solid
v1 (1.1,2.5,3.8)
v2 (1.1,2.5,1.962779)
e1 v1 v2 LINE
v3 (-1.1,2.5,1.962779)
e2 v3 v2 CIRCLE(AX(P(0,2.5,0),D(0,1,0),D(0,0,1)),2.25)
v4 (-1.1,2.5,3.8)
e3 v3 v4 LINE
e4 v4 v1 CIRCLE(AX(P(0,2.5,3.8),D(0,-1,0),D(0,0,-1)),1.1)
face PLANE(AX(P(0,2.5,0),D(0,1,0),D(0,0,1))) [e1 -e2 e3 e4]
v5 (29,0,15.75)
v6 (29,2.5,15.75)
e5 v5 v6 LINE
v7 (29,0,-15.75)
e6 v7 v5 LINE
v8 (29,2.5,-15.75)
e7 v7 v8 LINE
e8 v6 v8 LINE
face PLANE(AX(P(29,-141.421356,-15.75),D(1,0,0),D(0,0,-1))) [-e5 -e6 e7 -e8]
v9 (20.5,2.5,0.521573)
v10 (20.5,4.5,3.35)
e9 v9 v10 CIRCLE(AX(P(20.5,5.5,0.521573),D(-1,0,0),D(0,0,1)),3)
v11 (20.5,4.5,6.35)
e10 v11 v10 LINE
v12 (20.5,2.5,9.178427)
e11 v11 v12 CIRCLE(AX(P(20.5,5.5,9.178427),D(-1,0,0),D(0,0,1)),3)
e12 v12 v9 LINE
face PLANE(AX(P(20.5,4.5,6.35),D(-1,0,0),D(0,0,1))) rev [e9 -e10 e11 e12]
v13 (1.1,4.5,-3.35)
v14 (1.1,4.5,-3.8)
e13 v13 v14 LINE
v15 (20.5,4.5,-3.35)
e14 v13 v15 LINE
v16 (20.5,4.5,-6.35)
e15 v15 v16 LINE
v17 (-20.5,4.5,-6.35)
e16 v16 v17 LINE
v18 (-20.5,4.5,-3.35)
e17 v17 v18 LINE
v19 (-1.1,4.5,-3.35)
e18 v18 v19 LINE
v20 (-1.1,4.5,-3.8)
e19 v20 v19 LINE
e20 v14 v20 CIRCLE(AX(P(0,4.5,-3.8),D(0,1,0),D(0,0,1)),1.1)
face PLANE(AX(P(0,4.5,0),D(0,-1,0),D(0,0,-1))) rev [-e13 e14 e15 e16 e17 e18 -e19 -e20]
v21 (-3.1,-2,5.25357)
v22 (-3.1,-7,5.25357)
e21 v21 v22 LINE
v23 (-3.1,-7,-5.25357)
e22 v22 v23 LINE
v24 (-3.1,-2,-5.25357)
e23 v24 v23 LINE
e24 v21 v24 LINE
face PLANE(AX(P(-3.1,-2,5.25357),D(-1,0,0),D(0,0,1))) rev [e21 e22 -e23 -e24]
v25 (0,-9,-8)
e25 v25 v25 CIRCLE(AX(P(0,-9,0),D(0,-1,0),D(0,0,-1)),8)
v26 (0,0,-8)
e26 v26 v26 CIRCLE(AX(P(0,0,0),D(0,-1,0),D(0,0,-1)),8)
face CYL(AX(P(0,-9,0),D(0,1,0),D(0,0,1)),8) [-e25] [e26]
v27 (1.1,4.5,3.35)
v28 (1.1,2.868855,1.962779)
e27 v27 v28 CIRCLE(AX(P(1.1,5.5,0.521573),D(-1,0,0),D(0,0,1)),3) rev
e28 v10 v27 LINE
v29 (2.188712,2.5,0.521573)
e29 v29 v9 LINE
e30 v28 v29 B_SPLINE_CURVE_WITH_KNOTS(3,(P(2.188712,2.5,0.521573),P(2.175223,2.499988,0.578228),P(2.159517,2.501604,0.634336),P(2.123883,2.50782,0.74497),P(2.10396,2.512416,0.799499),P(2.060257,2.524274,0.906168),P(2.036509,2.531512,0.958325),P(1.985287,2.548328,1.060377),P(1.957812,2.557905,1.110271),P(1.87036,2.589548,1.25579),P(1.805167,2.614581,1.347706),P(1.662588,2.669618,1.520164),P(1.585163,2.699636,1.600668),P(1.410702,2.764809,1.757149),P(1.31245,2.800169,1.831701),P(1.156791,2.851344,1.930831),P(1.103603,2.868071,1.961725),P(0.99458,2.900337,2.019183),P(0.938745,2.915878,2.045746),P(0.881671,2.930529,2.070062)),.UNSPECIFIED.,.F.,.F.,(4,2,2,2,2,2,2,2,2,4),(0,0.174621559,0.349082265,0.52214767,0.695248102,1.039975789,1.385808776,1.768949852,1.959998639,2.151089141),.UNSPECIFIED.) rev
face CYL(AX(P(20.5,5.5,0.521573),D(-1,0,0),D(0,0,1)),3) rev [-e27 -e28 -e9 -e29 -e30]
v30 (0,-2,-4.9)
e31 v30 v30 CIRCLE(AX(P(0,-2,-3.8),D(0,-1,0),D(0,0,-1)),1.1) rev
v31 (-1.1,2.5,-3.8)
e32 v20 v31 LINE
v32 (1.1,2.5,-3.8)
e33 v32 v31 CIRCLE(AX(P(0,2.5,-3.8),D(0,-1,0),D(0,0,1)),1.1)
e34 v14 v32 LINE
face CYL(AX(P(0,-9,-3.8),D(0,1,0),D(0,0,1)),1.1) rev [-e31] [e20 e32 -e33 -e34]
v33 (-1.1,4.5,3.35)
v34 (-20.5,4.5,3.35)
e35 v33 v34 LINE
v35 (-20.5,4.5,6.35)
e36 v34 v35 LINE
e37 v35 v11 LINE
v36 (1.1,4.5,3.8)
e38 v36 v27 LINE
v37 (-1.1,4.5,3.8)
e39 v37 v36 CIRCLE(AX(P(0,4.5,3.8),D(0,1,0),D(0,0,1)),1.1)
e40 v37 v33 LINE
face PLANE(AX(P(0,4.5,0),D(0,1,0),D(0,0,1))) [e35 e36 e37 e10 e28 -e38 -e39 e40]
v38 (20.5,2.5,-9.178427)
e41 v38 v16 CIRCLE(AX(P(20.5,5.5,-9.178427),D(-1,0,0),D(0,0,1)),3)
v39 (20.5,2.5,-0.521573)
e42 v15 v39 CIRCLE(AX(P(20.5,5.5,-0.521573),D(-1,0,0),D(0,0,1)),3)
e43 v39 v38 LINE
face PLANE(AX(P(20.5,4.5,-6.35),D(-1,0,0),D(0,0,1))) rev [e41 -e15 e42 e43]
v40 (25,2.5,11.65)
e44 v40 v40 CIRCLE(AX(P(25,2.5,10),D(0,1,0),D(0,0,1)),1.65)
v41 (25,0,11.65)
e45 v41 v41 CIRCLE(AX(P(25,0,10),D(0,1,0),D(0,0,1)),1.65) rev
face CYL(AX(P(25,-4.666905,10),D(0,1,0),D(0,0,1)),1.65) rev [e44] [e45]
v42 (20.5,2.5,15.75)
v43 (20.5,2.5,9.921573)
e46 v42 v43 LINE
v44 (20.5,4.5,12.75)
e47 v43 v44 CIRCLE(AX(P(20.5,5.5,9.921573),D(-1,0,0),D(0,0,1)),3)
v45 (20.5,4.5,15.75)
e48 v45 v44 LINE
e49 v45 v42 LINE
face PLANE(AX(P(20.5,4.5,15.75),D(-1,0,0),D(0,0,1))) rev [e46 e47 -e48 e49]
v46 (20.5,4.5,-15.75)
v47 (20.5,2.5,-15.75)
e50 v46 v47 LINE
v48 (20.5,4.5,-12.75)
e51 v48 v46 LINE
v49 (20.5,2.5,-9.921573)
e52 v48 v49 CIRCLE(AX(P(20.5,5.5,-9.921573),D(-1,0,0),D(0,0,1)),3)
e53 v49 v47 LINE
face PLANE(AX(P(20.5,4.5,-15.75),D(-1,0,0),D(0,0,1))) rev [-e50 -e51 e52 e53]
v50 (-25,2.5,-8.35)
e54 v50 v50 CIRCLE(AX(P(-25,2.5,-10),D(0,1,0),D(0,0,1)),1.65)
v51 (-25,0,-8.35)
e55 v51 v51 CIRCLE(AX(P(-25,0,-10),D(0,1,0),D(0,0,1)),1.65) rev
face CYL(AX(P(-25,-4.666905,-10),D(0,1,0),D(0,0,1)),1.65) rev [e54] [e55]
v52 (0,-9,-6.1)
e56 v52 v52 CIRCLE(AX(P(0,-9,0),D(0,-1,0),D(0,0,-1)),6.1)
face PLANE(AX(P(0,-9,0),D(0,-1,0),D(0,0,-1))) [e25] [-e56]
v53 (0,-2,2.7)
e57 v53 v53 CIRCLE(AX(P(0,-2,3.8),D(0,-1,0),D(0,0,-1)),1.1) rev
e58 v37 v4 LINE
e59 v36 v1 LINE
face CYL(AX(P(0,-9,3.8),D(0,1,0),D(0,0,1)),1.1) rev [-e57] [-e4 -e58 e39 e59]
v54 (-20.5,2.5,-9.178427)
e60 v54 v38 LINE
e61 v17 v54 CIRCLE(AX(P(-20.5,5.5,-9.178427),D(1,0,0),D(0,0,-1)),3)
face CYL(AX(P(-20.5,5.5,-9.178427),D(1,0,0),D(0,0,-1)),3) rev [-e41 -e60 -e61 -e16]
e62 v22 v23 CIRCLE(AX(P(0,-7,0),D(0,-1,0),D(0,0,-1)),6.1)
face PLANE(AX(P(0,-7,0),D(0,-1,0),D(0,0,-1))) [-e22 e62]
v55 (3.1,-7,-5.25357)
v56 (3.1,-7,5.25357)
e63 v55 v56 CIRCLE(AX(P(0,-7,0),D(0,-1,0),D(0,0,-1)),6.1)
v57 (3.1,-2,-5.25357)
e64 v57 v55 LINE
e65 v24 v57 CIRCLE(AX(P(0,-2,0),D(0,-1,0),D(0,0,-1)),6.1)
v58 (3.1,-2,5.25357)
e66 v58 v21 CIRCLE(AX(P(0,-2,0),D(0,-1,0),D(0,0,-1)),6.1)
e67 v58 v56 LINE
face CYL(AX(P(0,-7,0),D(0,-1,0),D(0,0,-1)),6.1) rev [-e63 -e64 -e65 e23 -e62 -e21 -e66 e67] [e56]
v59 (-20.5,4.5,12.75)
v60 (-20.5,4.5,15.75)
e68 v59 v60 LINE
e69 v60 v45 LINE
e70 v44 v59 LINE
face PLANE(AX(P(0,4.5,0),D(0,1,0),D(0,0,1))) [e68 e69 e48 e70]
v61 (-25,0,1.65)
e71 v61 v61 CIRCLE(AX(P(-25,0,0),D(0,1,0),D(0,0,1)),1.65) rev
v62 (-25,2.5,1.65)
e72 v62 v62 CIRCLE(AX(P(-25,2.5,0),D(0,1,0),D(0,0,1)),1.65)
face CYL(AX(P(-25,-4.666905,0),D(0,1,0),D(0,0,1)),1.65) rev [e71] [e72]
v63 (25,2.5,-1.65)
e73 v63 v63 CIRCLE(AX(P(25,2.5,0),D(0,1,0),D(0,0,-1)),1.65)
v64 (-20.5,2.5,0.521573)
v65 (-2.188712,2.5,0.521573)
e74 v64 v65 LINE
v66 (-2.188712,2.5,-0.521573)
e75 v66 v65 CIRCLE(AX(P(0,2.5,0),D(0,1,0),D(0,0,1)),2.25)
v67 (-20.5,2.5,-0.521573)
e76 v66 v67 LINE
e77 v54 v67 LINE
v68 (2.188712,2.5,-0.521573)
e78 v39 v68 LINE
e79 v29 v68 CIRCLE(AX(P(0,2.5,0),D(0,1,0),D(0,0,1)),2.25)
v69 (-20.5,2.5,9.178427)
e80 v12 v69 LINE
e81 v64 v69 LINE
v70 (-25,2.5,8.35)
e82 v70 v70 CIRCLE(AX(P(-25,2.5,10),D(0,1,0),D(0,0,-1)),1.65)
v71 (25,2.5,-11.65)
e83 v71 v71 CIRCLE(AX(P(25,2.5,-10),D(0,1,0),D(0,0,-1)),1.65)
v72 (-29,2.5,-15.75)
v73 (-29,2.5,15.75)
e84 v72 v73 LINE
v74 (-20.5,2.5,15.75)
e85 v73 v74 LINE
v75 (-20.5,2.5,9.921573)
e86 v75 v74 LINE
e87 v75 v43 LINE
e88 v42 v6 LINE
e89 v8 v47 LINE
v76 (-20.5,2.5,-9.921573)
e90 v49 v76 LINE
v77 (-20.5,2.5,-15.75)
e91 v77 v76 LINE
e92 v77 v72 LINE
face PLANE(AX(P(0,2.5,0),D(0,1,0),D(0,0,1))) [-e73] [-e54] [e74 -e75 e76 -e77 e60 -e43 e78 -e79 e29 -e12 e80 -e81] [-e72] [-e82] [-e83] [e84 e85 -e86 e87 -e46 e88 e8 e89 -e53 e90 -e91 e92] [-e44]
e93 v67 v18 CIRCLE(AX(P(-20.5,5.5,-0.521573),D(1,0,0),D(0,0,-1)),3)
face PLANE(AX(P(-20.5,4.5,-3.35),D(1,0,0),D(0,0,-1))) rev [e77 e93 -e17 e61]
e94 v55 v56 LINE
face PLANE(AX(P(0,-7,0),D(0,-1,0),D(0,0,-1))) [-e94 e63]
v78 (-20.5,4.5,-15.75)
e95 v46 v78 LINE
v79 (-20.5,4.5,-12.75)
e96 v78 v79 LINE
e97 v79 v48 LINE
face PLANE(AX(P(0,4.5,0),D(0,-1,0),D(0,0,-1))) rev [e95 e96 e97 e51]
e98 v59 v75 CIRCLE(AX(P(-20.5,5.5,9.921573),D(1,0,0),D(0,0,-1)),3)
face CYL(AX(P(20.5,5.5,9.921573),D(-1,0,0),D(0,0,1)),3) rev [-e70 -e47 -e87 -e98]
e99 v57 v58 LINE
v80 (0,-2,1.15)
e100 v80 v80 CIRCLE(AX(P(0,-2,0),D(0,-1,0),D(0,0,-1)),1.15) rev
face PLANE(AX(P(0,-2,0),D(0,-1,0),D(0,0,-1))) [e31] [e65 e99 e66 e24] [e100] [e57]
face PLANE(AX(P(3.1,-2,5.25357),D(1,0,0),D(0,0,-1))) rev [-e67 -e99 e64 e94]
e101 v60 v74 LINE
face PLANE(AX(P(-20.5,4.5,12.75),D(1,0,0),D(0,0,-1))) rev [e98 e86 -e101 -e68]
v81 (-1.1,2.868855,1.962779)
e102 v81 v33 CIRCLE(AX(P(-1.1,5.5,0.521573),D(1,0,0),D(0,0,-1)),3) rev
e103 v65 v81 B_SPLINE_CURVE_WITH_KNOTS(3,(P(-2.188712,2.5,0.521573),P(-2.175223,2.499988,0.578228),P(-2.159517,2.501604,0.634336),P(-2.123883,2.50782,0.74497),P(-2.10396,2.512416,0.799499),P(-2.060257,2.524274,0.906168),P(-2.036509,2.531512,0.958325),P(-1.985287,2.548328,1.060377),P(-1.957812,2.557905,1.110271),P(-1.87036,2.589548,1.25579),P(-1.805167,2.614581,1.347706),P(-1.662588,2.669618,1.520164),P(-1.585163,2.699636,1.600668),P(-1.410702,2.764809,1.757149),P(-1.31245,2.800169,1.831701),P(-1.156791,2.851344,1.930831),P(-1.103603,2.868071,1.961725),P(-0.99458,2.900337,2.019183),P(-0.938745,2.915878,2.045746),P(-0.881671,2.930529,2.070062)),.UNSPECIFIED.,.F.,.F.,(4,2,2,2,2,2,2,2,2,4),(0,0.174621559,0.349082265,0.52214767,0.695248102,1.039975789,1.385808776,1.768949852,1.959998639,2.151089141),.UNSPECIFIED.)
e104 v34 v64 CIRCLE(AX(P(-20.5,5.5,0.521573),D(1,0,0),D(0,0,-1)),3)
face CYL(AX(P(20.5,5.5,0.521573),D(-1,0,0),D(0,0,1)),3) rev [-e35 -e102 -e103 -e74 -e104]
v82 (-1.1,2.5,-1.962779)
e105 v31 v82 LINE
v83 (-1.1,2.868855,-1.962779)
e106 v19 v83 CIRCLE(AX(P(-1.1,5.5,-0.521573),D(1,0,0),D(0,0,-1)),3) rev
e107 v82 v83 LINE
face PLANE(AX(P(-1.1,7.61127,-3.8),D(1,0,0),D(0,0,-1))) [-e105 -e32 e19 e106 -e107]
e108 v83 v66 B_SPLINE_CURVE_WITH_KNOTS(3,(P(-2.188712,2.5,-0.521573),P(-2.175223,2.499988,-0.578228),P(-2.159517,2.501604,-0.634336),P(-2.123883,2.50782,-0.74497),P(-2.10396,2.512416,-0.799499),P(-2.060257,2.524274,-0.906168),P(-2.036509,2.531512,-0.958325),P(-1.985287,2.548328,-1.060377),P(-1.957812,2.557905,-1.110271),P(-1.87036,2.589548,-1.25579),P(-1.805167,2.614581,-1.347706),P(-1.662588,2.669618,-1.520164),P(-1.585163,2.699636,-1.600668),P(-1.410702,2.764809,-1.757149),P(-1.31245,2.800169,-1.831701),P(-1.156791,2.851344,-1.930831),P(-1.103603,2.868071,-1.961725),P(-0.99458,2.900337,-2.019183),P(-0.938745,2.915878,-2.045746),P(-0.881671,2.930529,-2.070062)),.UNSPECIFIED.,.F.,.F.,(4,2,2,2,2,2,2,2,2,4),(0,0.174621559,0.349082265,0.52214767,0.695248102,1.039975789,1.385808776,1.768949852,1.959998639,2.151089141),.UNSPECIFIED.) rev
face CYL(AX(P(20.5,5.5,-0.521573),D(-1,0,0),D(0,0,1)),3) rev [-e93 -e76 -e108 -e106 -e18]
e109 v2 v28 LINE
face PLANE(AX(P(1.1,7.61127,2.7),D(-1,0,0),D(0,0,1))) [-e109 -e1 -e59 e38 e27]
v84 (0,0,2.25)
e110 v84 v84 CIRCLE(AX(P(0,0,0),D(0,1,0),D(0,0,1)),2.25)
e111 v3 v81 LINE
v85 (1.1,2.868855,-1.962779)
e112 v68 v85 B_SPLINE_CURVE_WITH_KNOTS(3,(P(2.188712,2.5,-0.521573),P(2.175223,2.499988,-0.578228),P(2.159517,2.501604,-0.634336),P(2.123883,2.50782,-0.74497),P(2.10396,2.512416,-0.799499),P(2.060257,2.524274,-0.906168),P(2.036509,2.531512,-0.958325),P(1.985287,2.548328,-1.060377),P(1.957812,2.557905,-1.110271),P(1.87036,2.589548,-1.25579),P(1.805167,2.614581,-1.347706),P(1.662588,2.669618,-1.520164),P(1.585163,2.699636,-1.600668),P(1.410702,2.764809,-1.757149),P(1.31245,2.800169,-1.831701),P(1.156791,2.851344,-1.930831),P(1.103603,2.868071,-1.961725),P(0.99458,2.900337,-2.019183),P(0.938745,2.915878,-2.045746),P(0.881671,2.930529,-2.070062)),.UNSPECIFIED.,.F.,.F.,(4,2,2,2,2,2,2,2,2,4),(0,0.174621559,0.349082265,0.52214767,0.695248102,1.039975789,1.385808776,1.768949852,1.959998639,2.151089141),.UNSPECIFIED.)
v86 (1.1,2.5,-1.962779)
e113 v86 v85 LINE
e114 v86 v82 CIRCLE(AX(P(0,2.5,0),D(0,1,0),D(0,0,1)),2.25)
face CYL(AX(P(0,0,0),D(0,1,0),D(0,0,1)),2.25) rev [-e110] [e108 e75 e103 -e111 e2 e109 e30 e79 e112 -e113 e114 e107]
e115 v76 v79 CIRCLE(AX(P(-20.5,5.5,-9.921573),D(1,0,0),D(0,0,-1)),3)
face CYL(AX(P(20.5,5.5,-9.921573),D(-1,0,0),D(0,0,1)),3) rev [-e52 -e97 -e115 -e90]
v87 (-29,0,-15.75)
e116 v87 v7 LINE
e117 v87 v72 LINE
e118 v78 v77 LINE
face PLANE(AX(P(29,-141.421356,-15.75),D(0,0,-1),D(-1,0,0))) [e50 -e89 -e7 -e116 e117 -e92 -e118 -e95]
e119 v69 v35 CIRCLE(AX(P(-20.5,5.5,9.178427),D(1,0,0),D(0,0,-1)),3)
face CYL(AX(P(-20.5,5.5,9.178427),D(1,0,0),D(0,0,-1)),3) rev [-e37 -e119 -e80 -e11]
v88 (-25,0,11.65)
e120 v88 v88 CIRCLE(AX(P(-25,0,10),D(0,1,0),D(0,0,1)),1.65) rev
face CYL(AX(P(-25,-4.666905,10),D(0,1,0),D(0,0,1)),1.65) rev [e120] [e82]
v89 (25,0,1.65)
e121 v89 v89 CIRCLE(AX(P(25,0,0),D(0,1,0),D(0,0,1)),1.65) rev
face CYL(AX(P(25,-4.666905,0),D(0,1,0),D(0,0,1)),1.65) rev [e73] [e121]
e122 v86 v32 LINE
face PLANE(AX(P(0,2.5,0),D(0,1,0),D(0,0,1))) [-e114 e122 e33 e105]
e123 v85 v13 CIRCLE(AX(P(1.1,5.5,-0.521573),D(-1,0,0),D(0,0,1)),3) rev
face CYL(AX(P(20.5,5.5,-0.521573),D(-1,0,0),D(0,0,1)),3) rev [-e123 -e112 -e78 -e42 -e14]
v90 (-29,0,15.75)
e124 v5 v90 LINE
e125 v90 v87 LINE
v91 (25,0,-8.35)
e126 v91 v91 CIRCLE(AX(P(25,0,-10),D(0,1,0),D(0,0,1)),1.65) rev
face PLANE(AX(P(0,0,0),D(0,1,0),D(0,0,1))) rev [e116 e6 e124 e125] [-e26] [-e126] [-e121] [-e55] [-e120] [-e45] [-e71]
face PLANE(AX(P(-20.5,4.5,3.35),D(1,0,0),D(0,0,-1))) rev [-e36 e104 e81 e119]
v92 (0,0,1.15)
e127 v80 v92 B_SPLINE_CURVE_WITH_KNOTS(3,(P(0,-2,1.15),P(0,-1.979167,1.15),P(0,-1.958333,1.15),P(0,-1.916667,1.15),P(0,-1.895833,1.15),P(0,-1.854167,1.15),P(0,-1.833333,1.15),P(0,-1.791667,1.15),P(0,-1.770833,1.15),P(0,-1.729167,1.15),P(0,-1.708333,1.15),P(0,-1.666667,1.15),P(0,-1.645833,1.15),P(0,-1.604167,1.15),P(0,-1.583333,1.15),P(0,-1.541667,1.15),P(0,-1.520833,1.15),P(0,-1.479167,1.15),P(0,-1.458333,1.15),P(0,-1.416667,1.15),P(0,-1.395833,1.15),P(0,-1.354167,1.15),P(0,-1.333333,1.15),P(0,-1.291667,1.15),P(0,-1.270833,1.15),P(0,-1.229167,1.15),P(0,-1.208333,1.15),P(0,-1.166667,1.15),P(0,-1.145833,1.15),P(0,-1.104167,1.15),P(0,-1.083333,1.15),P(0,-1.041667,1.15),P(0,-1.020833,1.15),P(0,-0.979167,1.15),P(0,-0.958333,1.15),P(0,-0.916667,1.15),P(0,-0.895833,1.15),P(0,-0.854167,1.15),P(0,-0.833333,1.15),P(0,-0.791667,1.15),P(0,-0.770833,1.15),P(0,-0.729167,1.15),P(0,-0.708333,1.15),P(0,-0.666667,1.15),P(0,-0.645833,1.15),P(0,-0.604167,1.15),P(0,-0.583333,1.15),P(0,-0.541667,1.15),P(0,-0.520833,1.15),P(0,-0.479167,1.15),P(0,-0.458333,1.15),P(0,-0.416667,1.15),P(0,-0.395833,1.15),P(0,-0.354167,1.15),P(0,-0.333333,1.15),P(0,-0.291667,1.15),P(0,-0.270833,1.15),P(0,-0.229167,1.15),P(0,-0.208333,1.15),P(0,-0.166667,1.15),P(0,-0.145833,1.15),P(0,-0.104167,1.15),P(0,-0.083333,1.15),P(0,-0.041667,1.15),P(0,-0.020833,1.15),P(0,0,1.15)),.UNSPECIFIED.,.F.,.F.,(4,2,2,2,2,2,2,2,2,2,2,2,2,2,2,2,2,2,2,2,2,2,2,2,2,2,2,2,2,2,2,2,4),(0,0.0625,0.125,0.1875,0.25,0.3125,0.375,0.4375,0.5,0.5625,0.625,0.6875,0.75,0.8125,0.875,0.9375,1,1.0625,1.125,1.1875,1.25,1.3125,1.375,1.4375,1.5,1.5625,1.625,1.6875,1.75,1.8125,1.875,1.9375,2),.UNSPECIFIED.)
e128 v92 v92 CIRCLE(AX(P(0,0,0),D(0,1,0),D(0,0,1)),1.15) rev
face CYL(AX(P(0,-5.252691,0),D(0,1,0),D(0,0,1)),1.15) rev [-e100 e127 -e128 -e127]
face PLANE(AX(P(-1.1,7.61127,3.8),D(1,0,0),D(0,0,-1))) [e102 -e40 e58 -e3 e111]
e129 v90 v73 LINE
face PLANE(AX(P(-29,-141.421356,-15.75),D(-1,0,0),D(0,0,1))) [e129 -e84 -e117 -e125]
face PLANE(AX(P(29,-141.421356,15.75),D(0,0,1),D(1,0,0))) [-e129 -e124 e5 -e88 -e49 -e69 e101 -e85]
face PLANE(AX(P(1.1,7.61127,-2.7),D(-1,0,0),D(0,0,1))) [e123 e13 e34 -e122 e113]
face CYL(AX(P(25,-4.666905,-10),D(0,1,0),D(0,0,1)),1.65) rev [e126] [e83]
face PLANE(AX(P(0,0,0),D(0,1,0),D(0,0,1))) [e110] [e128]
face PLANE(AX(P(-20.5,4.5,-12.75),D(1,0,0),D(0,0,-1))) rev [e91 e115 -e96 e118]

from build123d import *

# Parameters (mm, degrees)
SKETCH_1_R               = 50
EXTRUDE_1_DEPTH          = 2.5
SKETCH_2_R               = 8
EXTRUDE_2_DEPTH          = 9
SKETCH_3_R               = 6.1
CUT_EXTRUDE_1_DEPTH      = 2
CUT_EXTRUDE_2_DEPTH      = 5
SKETCH_7_R               = 1.15
CUT_EXTRUDE_4_DEPTH      = 4.5
SKETCH_8_R               = 2.25
CUT_EXTRUDE_5_DEPTH      = 2.5
CUT_EXTRUDE_6_DEPTH      = 72.281133549
CUT_EXTRUDE_6_DEPTH_BACK = 72.281133549
SKETCH_11_R              = 1.1
SKETCH_14_R              = 1.65
CUT_EXTRUDE_7_DEPTH      = 2.5
CUT_EXTRUDE_START        = -2.5
SKETCH_15_R              = 50
SKETCH_15_W              = 58
SKETCH_15_H              = 31.5
CUT_EXTRUDE_8_DEPTH      = 2.5
SKETCH_16_W              = 41
SKETCH_16_H              = 3
EXTRUDE_4_DEPTH          = 2
CUT_EXTRUDE_9_DEPTH      = 2
FILLET_3_R               = 3


with BuildPart() as part:
    # Эскиз1 → Бобышка-Вытянуть1 (new body)
    with BuildSketch(Plane(origin=(0, 0, 0), x_dir=(1, 0, 0), z_dir=(0, 1, 0))):
        with Locations(Location((0, 0, 0), (0, 0, 270))):
            Circle(SKETCH_1_R)
    extrude(amount=EXTRUDE_1_DEPTH)

    # Эскиз2 → Бобышка-Вытянуть2 (add)
    with BuildSketch(Plane.XZ):
        with Locations(Location((0, 0, 0), (0, 0, 270))):
            Circle(SKETCH_2_R)
    extrude(amount=EXTRUDE_2_DEPTH)

    # Эскиз3 → Вырез-Вытянуть1 (cut)
    with BuildSketch(Plane.XZ.offset(9)):
        with Locations(Location((0, 0, 0), (0, 0, 270))):
            Circle(SKETCH_3_R)
    extrude(amount=-CUT_EXTRUDE_1_DEPTH, mode=Mode.SUBTRACT)

    # Эскиз4 → Вырез-Вытянуть2 (cut)
    with BuildSketch(Plane.XZ.offset(7)):
        with BuildLine():
            Line((-3.1, 5.253570215), (-3.1, -5.253570215))
            ThreePointArc((-3.1, -5.253570215), (0, -6.1), (3.1, -5.253570215))
            Line((3.1, -5.253570215), (3.1, 5.253570215))
            ThreePointArc((3.1, 5.253570215), (0, 6.1), (-3.1, 5.253570215))
        make_face()
    extrude(amount=-CUT_EXTRUDE_2_DEPTH, mode=Mode.SUBTRACT)

    # Эскиз7 → Вырез-Вытянуть4 (cut)
    with BuildSketch(Plane(origin=(0, 2.5, 0), x_dir=(1, 0, 0), z_dir=(0, 1, 0))):
        with Locations(Location((0, 0, 0), (0, 0, 270))):
            Circle(SKETCH_7_R)
    extrude(amount=-CUT_EXTRUDE_4_DEPTH, mode=Mode.SUBTRACT)

    # Эскиз8 → Вырез-Вытянуть5 (cut)
    with BuildSketch(Plane(origin=(0, 2.5, 0), x_dir=(1, 0, 0), z_dir=(0, 1, 0))):
        with Locations(Location((0, 0, 0), (0, 0, 270))):
            Circle(SKETCH_8_R)
    extrude(amount=-CUT_EXTRUDE_5_DEPTH, mode=Mode.SUBTRACT)

    # Эскиз11 → Вырез-Вытянуть6 (cut, two sides: drawn at the far end of the back side and taken through both)
    with BuildSketch(Plane.XZ.offset(-CUT_EXTRUDE_6_DEPTH_BACK)):
        with Locations(Location((0, 3.8, 0), (0, 0, 270))):
            Circle(SKETCH_11_R)
        with Locations(Location((0, -3.8, 0), (0, 0, 90))):
            Circle(SKETCH_11_R)
    extrude(amount=CUT_EXTRUDE_6_DEPTH + CUT_EXTRUDE_6_DEPTH_BACK, mode=Mode.SUBTRACT)

    # Эскиз14 → Вырез-Вытянуть7 (cut)
    with BuildSketch(Plane(origin=(0, 2.5, 0), x_dir=(1, 0, 0), z_dir=(0, 1, 0))):
        with Locations(Location((-25, 0, 0), (0, 0, 270))):
            Circle(SKETCH_14_R)
        with Locations(Location((-25, 10, 0), (0, 0, 270))):
            Circle(SKETCH_14_R)
        with Locations(Location((-25, -10, 0), (0, 0, 270))):
            Circle(SKETCH_14_R)
        with Locations(Location((25, -10, 0), (0, 0, 270))):
            Circle(SKETCH_14_R)
        with Locations(Location((25, 0, 0), (0, 0, 270))):
            Circle(SKETCH_14_R)
        with Locations(Location((25, 10, 0), (0, 0, 270))):
            Circle(SKETCH_14_R)
    extrude(amount=-CUT_EXTRUDE_7_DEPTH, mode=Mode.SUBTRACT)

    # Эскиз15 → Вырез-Вытянуть8 (cut)
    with BuildSketch(Plane(origin=(0, 2.5, 0), x_dir=(1, 0, 0), z_dir=(0, 1, 0)).offset(CUT_EXTRUDE_START)):
        Circle(SKETCH_15_R)
        Rectangle(SKETCH_15_W, SKETCH_15_H, mode=Mode.SUBTRACT)
    extrude(amount=CUT_EXTRUDE_8_DEPTH, mode=Mode.SUBTRACT)

    # Эскиз16 → Бобышка-Вытянуть4 (add)
    with BuildSketch(Plane(origin=(0, 2.5, 0), x_dir=(1, 0, 0), z_dir=(0, 1, 0))):
        with Locations((0, 14.25)):
            Rectangle(SKETCH_16_W, SKETCH_16_H)
        with Locations((0, 4.85)):
            Rectangle(SKETCH_16_W, SKETCH_16_H)
        with Locations((0, -4.85)):
            Rectangle(SKETCH_16_W, SKETCH_16_H)
        with Locations((0, -14.25)):
            Rectangle(SKETCH_16_W, SKETCH_16_H)
    extrude(amount=EXTRUDE_4_DEPTH)

    # Эскиз17 → Вырез-Вытянуть9 (cut)
    with BuildSketch(Plane(origin=(0, 2.5, 0), x_dir=(1, 0, 0), z_dir=(0, 1, 0))):
        with BuildLine():
            Line((-1.1, 3.8), (-1.1, 2.7))
            Line((-1.1, 2.7), (1.1, 2.7))
            Line((1.1, 2.7), (1.1, 3.8))
            ThreePointArc((1.1, 3.8), (0, 4.9), (-1.1, 3.8))
        make_face()
        with BuildLine():
            Line((-1.1, -3.8), (-1.1, -2.7))
            Line((-1.1, -2.7), (1.1, -2.7))
            Line((1.1, -2.7), (1.1, -3.8))
            ThreePointArc((1.1, -3.8), (0, -4.9), (-1.1, -3.8))
        make_face()
    extrude(amount=CUT_EXTRUDE_9_DEPTH, mode=Mode.SUBTRACT)

    # Скругление3
    # the kernel refuses this fillet: 3 mm, written as the material it adds along each edge
    with BuildSketch(Plane(origin=(20.5, 2.5, 12.75), x_dir=(0, 0, -1), z_dir=(-1, 0, 0)), Plane(origin=(-20.5, 2.5, 6.35), x_dir=(0, 0, 1), z_dir=(1, 0, 0))) as fillet_3_piece_1:
        with BuildLine():
            CenterArc((2.828427125, -3), FILLET_3_R, 90, 70.528779366)
            Line((0, -2), (-0.056568542, -1.98))
            ThreePointArc((-0.056568542, -1.98), (-0.06, -1), (-0.06, 0))
            Line((-0.06, 0), (0, 0.06))
            Line((0, 0.06), (2.828427125, 0.06))
            Line((2.828427125, 0.06), (2.828427125, 0))
        make_face()
    extrude(amount=41)
    with BuildSketch(Plane(origin=(20.5, 2.5, 3.35), x_dir=(0, 0, -1), z_dir=(-1, 0, 0))) as fillet_3_piece_2_section:
        with BuildLine():
            CenterArc((2.828427125, -3), FILLET_3_R, 90, 70.528779366)
            Line((0, -2), (-0.056568542, -1.98))
            ThreePointArc((-0.056568542, -1.98), (-0.06, -1), (-0.06, 0))
            Line((-0.06, 0), (0, 0.06))
            Line((0, 0.06), (2.828427125, 0.06))
            Line((2.828427125, 0.06), (2.828427125, 0))
        make_face()
    fillet_3_piece_2 = extrude(amount=19.4, mode=Mode.PRIVATE)
    fillet_3_piece_2 = fillet_3_piece_2 - Plane(origin=(0, 3.015381172, 0), x_dir=(0, 0, 1), z_dir=(0, 1, 0)) * Cylinder(2.25, 51, mode=Mode.PRIVATE)
    add(fillet_3_piece_2)
    with BuildSketch(Plane(origin=(20.5, 2.5, 3.35), x_dir=(0, 0, -1), z_dir=(-1, 0, 0))) as fillet_3_piece_3_section:
        with BuildLine():
            CenterArc((2.828427125, -3), FILLET_3_R, 90, 70.528779366)
            Line((0, -2), (-0.056568542, -1.98))
            ThreePointArc((-0.056568542, -1.98), (-0.06, -1), (-0.06, 0))
            Line((-0.06, 0), (0, 0.06))
            Line((0, 0.06), (2.828427125, 0.06))
            Line((2.828427125, 0.06), (2.828427125, 0))
        make_face()
    fillet_3_piece_3 = extrude(amount=26.471067812, mode=Mode.PRIVATE)
    fillet_3_piece_3 = fillet_3_piece_3 - Plane(origin=(0, 3.020982336, 0), x_dir=(0, 0, 1), z_dir=(0, 1, 0)) * Cylinder(2.25, 65, mode=Mode.PRIVATE)
    fillet_3_piece_3 = split(fillet_3_piece_3, bisect_by=Plane(origin=(-1.1, 3.020982336, 2.69327095), z_dir=(-1, 0, 0)), keep=Keep.TOP, mode=Mode.PRIVATE)
    add(fillet_3_piece_3)
    with BuildSketch(Plane(origin=(5.971067812, 2.5, 3.35), x_dir=(0, 0, -1), z_dir=(-1, 0, 0))) as fillet_3_piece_4_section:
        with BuildLine():
            CenterArc((2.828427125, -3), FILLET_3_R, 90, 70.528779366)
            Line((0, -2), (-0.056568542, -1.98))
            ThreePointArc((-0.056568542, -1.98), (-0.06, -1), (-0.06, 0))
            Line((-0.06, 0), (0, 0.06))
            Line((0, 0.06), (2.828427125, 0.06))
            Line((2.828427125, 0.06), (2.828427125, 0))
        make_face()
    fillet_3_piece_4 = extrude(amount=26.471067812, mode=Mode.PRIVATE)
    fillet_3_piece_4 = fillet_3_piece_4 - Plane(origin=(0, 3.020982326, 0), x_dir=(0, 0, 1), z_dir=(0, 1, 0)) * Cylinder(2.25, 65, mode=Mode.PRIVATE)
    fillet_3_piece_4 = split(fillet_3_piece_4, bisect_by=Plane(origin=(1.1, 3.020982326, 2.69327092), z_dir=(1, 0, 0)), keep=Keep.TOP, mode=Mode.PRIVATE)
    add(fillet_3_piece_4)
    with BuildSketch(Plane(origin=(-1.1, 2.5, 3.35), x_dir=(0, 0, -1), z_dir=(-1, 0, 0))) as fillet_3_piece_5_section:
        with BuildLine():
            CenterArc((2.828427125, -3), FILLET_3_R, 90, 70.528779366)
            Line((0, -2), (-0.056568542, -1.98))
            ThreePointArc((-0.056568542, -1.98), (-0.06, -1), (-0.06, 0))
            Line((-0.06, 0), (0, 0.06))
            Line((0, 0.06), (2.828427125, 0.06))
            Line((2.828427125, 0.06), (2.828427125, 0))
        make_face()
    fillet_3_piece_5 = extrude(amount=19.4, mode=Mode.PRIVATE)
    fillet_3_piece_5 = fillet_3_piece_5 - Plane(origin=(0, 3.015381179, 0), x_dir=(0, 0, 1), z_dir=(0, 1, 0)) * Cylinder(2.25, 51, mode=Mode.PRIVATE)
    add(fillet_3_piece_5)
    with BuildSketch(Plane(origin=(5.971067812, 2.5, -3.35), x_dir=(0, 0, 1), z_dir=(-1, 0, 0))) as fillet_3_piece_6_section:
        with BuildLine():
            CenterArc((2.828427125, 3), FILLET_3_R, 199.471220634, 70.528779366)
            Line((0, 2), (-0.056568542, 1.98))
            ThreePointArc((-0.056568542, 1.98), (-0.06, 1), (-0.06, 0))
            Line((-0.06, 0), (0, -0.06))
            Line((0, -0.06), (2.828427125, -0.06))
            Line((2.828427125, -0.06), (2.828427125, 0))
        make_face()
    fillet_3_piece_6 = extrude(amount=26.471067812, mode=Mode.PRIVATE)
    fillet_3_piece_6 = fillet_3_piece_6 - Plane(origin=(0, 3.020982336, 0), x_dir=(0, 0, 1), z_dir=(0, 1, 0)) * Cylinder(2.25, 65, mode=Mode.PRIVATE)
    fillet_3_piece_6 = split(fillet_3_piece_6, bisect_by=Plane(origin=(1.1, 3.020982336, -2.69327095), z_dir=(1, 0, 0)), keep=Keep.TOP, mode=Mode.PRIVATE)
    add(fillet_3_piece_6)
    with BuildSketch(Plane(origin=(-1.1, 2.5, -3.35), x_dir=(0, 0, 1), z_dir=(-1, 0, 0))) as fillet_3_piece_7_section:
        with BuildLine():
            CenterArc((2.828427125, 3), FILLET_3_R, 199.471220634, 70.528779366)
            Line((0, 2), (-0.056568542, 1.98))
            ThreePointArc((-0.056568542, 1.98), (-0.06, 1), (-0.06, 0))
            Line((-0.06, 0), (0, -0.06))
            Line((0, -0.06), (2.828427125, -0.06))
            Line((2.828427125, -0.06), (2.828427125, 0))
        make_face()
    fillet_3_piece_7 = extrude(amount=19.4, mode=Mode.PRIVATE)
    fillet_3_piece_7 = fillet_3_piece_7 - Plane(origin=(0, 3.015381172, 0), x_dir=(0, 0, 1), z_dir=(0, 1, 0)) * Cylinder(2.25, 51, mode=Mode.PRIVATE)
    add(fillet_3_piece_7)
    with BuildSketch(Plane(origin=(20.5, 2.5, -3.35), x_dir=(0, 0, 1), z_dir=(-1, 0, 0))) as fillet_3_piece_8_section:
        with BuildLine():
            CenterArc((2.828427125, 3), FILLET_3_R, 199.471220634, 70.528779366)
            Line((0, 2), (-0.056568542, 1.98))
            ThreePointArc((-0.056568542, 1.98), (-0.06, 1), (-0.06, 0))
            Line((-0.06, 0), (0, -0.06))
            Line((0, -0.06), (2.828427125, -0.06))
            Line((2.828427125, -0.06), (2.828427125, 0))
        make_face()
    fillet_3_piece_8 = extrude(amount=19.4, mode=Mode.PRIVATE)
    fillet_3_piece_8 = fillet_3_piece_8 - Plane(origin=(0, 3.015381179, 0), x_dir=(0, 0, 1), z_dir=(0, 1, 0)) * Cylinder(2.25, 51, mode=Mode.PRIVATE)
    add(fillet_3_piece_8)
    with BuildSketch(Plane(origin=(20.5, 2.5, -3.35), x_dir=(0, 0, 1), z_dir=(-1, 0, 0))) as fillet_3_piece_9_section:
        with BuildLine():
            CenterArc((2.828427125, 3), FILLET_3_R, 199.471220634, 70.528779366)
            Line((0, 2), (-0.056568542, 1.98))
            ThreePointArc((-0.056568542, 1.98), (-0.06, 1), (-0.06, 0))
            Line((-0.06, 0), (0, -0.06))
            Line((0, -0.06), (2.828427125, -0.06))
            Line((2.828427125, -0.06), (2.828427125, 0))
        make_face()
    fillet_3_piece_9 = extrude(amount=26.471067812, mode=Mode.PRIVATE)
    fillet_3_piece_9 = fillet_3_piece_9 - Plane(origin=(0, 3.020982325, 0), x_dir=(0, 0, 1), z_dir=(0, 1, 0)) * Cylinder(2.25, 65, mode=Mode.PRIVATE)
    fillet_3_piece_9 = split(fillet_3_piece_9, bisect_by=Plane(origin=(-1.1, 3.020982325, -2.69327092), z_dir=(-1, 0, 0)), keep=Keep.TOP, mode=Mode.PRIVATE)
    add(fillet_3_piece_9)
    with BuildSketch(Plane(origin=(-20.5, 2.5, -6.35), x_dir=(0, 0, -1), z_dir=(1, 0, 0)), Plane(origin=(20.5, 2.5, -12.75), x_dir=(0, 0, 1), z_dir=(-1, 0, 0))) as fillet_3_piece_10:
        with BuildLine():
            CenterArc((2.828427125, 3), FILLET_3_R, 199.471220634, 70.528779366)
            Line((0, 2), (-0.056568542, 1.98))
            ThreePointArc((-0.056568542, 1.98), (-0.06, 1), (-0.06, 0))
            Line((-0.06, 0), (0, -0.06))
            Line((0, -0.06), (2.828427125, -0.06))
            Line((2.828427125, -0.06), (2.828427125, 0))
        make_face()
    extrude(amount=41)


solid = part.part
